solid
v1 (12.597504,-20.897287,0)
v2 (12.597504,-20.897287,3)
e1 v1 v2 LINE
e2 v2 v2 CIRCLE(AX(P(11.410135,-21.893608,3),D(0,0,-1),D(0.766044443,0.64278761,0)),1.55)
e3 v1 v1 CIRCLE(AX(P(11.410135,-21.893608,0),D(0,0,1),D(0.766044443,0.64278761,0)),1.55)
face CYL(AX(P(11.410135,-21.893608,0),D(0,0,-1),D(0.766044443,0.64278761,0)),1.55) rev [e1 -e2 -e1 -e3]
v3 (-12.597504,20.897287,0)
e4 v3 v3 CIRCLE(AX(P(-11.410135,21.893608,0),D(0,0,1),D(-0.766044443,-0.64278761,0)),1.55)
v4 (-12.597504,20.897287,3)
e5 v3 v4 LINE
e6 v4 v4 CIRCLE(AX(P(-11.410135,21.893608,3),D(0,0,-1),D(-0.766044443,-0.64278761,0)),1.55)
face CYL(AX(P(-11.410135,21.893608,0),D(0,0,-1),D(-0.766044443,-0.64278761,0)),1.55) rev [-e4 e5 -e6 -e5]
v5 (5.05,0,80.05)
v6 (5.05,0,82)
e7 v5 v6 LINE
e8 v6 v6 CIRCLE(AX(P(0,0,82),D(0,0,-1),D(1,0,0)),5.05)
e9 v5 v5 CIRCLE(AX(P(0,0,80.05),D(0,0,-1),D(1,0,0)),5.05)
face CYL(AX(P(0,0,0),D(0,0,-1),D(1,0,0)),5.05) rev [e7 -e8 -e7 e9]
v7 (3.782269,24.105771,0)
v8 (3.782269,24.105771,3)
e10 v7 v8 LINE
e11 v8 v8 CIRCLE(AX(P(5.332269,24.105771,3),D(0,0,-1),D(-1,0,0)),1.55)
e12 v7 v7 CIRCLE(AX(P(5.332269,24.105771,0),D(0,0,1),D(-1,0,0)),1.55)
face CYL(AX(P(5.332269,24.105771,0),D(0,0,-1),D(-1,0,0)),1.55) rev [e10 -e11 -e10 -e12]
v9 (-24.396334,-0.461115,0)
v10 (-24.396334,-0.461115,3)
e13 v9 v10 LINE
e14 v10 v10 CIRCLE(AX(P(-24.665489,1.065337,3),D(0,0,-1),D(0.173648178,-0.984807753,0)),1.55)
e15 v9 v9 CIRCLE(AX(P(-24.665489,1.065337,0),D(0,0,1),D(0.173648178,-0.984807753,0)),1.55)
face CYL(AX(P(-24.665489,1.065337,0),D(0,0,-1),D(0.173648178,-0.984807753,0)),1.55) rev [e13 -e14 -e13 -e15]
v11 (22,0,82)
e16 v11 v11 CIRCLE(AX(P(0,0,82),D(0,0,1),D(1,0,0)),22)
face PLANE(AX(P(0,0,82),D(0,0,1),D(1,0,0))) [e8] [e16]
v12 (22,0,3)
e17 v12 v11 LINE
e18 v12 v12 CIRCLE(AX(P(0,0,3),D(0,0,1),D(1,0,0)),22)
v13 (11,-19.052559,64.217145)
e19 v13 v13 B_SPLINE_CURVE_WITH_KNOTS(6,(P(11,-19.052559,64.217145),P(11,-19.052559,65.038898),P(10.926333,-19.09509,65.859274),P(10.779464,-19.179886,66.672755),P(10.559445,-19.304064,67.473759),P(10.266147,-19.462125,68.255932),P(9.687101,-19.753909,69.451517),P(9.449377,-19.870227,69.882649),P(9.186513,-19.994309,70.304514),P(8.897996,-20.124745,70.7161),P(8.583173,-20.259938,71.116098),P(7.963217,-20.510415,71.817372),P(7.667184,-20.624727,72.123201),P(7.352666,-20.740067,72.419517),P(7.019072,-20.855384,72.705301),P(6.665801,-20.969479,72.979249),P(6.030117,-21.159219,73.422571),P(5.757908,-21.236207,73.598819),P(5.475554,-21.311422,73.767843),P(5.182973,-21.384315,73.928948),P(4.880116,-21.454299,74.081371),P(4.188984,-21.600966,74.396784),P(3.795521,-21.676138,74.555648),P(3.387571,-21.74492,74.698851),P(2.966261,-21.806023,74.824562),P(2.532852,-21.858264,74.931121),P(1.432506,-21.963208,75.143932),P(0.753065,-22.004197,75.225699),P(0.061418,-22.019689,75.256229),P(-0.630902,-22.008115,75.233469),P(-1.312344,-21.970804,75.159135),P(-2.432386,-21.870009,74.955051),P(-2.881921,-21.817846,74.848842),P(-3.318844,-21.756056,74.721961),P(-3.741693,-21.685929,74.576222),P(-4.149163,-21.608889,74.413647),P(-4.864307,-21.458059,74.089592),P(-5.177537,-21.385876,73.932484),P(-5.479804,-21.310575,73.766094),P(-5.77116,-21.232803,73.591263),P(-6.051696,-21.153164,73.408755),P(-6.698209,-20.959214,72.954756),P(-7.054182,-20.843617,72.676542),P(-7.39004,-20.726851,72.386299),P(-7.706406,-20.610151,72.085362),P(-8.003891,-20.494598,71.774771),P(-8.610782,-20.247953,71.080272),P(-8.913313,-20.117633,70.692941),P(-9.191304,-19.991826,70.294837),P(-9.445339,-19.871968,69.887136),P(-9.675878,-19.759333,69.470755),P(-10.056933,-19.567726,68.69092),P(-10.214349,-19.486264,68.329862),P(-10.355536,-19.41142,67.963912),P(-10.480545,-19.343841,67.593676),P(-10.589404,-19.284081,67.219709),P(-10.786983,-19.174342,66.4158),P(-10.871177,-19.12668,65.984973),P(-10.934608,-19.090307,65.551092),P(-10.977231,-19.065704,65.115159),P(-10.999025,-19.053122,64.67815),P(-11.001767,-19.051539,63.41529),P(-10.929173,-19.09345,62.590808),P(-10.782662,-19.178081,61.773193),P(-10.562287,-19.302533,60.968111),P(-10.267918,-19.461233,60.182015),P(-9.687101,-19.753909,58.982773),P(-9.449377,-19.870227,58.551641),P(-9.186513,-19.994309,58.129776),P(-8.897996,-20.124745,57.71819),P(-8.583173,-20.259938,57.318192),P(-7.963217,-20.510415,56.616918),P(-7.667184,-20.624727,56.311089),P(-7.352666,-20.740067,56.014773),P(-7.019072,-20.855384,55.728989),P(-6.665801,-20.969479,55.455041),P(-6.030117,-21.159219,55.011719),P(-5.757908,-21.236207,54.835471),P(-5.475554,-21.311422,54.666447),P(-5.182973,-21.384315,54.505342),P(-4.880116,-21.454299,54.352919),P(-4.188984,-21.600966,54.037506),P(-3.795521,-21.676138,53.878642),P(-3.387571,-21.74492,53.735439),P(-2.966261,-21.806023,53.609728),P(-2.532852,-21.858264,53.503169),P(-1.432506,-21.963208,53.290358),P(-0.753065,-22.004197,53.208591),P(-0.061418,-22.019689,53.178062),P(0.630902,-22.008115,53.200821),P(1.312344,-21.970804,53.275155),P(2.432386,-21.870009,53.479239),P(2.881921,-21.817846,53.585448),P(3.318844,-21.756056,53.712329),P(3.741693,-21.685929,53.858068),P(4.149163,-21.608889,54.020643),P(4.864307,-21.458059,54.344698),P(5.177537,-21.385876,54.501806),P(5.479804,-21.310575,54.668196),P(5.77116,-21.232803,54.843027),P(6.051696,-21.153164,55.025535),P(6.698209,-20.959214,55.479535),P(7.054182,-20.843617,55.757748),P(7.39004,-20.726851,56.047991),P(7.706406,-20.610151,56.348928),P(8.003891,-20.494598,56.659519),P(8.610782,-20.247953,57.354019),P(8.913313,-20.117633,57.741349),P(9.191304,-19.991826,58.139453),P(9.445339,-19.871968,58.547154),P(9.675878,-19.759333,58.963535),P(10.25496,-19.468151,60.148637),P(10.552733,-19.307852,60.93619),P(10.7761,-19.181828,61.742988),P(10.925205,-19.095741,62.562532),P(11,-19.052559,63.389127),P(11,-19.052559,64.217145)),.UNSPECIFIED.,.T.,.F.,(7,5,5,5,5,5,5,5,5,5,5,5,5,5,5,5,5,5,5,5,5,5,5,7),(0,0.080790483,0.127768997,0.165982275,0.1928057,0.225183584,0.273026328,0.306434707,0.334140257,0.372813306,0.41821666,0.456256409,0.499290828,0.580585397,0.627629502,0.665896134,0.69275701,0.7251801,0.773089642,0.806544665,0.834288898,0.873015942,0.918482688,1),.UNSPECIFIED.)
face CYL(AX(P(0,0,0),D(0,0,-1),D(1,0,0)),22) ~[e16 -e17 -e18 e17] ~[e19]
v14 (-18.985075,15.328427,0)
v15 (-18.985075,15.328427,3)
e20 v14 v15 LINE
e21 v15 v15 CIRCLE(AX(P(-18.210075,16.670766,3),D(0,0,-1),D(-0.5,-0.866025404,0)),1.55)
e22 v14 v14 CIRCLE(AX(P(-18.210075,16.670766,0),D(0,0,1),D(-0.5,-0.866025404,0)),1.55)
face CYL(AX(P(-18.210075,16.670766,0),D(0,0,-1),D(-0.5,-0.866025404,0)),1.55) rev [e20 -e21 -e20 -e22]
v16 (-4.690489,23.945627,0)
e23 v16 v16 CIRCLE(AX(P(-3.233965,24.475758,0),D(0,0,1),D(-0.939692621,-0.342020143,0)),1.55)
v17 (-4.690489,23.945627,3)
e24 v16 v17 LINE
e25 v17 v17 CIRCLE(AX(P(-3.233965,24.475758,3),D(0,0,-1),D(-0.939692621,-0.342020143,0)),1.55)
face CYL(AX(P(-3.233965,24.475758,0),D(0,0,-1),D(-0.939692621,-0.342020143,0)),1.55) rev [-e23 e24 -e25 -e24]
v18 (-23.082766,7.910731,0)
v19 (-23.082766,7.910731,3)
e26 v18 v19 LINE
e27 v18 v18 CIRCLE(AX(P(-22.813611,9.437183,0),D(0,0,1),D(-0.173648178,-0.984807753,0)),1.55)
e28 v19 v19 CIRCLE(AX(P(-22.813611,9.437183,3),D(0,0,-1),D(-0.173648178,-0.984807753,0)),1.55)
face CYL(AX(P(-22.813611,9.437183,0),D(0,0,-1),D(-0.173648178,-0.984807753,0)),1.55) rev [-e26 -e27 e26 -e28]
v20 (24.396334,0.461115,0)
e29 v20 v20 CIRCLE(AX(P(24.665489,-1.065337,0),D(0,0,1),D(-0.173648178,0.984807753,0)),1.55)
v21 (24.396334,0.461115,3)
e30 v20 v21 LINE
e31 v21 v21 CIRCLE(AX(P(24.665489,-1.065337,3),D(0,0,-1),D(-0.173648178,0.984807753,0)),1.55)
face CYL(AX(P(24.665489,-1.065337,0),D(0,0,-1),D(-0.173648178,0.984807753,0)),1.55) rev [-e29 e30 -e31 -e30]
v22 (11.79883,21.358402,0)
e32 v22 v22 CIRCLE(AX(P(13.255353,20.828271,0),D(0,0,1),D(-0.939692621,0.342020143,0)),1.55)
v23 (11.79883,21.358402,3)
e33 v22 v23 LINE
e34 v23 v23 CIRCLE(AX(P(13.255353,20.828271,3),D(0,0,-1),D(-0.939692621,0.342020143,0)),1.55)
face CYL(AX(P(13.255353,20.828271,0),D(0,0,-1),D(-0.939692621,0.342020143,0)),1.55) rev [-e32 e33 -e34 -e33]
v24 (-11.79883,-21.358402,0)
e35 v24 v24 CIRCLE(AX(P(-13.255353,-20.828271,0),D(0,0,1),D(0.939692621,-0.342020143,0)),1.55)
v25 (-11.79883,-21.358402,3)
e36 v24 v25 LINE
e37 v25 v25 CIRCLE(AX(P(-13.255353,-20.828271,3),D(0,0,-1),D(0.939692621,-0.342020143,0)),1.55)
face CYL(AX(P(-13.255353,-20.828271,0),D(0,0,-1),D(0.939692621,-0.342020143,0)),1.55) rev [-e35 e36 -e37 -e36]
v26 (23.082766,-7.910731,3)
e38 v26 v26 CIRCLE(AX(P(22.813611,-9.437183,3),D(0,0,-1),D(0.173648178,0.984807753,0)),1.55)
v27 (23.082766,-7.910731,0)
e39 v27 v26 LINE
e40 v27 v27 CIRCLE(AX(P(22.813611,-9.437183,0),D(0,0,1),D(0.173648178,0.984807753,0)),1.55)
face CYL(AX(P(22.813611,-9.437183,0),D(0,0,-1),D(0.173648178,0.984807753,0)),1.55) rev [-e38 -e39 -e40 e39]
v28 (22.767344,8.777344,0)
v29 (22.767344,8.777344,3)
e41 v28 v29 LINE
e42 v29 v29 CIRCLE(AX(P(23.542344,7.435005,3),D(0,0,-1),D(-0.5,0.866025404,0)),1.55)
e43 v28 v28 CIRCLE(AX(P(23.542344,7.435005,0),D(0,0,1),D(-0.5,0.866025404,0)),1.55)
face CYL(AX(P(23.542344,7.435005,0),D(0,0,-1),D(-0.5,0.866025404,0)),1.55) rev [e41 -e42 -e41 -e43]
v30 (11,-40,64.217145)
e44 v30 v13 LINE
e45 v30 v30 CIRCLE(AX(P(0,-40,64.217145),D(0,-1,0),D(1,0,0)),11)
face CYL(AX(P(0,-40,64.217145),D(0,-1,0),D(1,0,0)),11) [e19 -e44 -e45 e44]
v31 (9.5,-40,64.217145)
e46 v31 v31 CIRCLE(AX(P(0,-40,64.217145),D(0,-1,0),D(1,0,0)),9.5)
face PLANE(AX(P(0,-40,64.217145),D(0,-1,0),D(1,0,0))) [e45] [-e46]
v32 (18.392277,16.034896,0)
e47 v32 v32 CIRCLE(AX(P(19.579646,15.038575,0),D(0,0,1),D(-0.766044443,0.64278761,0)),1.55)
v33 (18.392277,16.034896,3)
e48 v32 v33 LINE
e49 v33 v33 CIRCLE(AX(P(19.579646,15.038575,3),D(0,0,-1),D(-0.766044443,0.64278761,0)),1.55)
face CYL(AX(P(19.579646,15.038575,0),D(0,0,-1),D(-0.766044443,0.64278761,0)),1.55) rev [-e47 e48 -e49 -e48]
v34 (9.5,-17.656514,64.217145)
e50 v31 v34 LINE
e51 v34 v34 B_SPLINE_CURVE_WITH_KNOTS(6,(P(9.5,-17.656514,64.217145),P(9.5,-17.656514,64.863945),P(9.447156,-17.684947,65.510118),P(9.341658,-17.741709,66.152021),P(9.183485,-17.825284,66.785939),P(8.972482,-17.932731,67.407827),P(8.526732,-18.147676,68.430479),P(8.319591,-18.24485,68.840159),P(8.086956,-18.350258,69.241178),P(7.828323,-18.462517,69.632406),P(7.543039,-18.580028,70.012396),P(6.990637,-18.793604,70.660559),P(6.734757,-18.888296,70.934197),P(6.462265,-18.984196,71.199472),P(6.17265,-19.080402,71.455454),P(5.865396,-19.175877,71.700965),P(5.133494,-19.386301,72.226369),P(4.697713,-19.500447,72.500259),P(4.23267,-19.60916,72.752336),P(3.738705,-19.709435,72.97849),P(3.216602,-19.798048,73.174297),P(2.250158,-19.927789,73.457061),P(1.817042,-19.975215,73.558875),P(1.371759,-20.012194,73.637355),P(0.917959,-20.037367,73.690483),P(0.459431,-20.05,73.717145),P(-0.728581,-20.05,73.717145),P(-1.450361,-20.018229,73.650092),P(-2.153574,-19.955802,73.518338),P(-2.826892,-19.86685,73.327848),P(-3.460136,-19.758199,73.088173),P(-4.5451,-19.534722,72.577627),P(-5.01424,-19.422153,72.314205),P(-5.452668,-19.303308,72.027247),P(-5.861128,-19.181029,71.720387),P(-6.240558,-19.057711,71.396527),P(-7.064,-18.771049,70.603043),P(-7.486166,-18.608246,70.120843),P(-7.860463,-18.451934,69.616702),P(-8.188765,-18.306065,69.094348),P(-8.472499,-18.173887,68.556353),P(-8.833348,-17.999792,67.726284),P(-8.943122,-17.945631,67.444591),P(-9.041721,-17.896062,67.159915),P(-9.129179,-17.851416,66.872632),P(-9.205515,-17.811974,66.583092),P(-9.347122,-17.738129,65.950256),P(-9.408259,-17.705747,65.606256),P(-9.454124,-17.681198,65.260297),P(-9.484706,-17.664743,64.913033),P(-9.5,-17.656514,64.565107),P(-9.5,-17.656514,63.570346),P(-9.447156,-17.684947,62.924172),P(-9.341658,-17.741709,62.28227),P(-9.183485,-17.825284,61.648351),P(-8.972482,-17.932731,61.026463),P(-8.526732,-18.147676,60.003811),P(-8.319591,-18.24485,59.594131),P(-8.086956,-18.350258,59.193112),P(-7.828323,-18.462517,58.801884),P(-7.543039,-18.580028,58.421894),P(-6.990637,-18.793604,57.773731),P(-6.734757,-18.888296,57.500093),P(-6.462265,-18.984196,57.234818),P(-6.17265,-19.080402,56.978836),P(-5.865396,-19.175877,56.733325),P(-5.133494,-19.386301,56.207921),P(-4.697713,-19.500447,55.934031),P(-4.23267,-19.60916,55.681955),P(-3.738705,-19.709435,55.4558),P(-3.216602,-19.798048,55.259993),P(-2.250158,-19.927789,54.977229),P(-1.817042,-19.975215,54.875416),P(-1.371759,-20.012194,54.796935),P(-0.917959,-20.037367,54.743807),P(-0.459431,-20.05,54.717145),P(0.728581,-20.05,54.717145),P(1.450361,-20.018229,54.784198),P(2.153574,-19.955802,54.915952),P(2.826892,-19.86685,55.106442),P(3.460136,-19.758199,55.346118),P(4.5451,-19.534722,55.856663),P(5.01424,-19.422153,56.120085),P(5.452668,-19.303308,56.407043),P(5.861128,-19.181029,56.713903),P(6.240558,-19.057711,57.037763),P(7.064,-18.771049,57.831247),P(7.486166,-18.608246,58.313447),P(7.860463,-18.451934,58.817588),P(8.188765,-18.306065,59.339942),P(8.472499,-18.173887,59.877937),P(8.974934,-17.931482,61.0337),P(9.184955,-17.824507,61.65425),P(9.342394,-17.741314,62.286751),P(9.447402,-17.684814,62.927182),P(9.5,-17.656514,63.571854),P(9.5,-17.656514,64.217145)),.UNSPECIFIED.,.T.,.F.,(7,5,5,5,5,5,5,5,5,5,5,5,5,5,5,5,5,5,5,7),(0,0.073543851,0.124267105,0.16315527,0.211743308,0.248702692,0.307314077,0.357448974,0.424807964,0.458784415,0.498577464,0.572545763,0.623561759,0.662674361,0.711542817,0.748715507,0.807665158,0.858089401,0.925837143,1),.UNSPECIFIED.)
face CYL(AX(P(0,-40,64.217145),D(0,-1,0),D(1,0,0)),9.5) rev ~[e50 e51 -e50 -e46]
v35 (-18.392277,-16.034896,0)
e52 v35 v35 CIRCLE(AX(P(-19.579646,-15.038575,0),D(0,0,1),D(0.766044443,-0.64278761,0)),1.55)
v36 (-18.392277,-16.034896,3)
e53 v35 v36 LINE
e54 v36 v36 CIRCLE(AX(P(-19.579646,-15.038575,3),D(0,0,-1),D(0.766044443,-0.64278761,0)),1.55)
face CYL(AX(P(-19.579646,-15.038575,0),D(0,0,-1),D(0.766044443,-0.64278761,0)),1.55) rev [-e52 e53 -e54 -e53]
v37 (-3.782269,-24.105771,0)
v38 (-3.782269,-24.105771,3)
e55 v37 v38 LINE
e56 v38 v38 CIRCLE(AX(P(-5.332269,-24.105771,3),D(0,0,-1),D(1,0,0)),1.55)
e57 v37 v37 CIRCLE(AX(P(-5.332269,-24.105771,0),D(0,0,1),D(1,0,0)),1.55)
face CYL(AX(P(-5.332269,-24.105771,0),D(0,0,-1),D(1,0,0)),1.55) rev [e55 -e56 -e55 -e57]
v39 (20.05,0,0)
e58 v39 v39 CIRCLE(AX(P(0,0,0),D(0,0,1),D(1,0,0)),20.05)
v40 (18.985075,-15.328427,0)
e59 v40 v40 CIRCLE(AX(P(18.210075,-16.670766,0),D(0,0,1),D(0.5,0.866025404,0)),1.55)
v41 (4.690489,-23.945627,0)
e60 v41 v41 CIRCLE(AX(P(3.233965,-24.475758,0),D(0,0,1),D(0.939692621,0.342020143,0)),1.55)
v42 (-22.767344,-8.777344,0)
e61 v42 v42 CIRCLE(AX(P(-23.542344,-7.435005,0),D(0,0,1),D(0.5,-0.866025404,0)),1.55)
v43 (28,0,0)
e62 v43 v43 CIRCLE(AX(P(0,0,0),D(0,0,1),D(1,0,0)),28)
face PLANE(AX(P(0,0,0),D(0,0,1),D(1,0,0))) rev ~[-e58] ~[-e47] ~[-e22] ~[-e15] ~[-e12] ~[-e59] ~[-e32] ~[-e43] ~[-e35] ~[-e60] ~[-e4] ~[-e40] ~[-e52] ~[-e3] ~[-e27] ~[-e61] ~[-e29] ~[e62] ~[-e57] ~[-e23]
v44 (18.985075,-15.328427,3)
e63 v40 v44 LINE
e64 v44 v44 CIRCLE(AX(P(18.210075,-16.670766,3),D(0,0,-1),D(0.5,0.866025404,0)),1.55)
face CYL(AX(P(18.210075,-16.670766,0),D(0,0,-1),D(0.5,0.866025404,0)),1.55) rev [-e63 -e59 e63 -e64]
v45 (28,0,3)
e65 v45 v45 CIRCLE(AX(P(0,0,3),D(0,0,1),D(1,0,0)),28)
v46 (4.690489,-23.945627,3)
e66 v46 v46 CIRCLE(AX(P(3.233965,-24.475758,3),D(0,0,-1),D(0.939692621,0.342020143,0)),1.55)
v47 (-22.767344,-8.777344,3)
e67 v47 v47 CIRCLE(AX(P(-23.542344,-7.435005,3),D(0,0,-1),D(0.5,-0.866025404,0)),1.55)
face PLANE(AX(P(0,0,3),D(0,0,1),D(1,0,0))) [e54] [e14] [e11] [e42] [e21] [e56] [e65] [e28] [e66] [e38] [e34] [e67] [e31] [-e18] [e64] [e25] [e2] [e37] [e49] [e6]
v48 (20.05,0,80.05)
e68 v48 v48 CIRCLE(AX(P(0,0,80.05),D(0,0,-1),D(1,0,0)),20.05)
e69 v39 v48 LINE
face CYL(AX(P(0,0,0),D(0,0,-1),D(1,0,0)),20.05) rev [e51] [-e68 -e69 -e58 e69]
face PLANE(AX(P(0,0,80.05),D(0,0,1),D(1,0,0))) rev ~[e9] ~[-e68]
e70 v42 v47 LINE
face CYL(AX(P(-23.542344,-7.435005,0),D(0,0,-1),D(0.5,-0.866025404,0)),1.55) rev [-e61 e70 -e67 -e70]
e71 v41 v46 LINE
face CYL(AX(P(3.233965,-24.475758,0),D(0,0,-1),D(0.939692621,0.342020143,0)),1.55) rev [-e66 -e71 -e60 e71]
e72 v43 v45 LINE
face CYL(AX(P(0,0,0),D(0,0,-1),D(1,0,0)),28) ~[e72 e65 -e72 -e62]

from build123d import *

# Parameters (mm, degrees)
F0_R            = 22
F1_DEPTH        = 82
F2_T            = -1.95
F0_R_2          = 28
F3_DEPTH        = 3
F5_R            = 5.05
F6_DEPTH        = 90
F7_R            = 1.55
F8_DEPTH        = 5
F8_COPIES_COUNT = 18
F10_R           = 11
F12_R           = 9.5
F13_DEPTH       = 30


# Not quite as in the source:
# - a pattern or mirror of a feature is missing from the dataset's text; its kind, count and spacing are read off the source's solid


with BuildPart() as f1:
    # F0 (on Top) → F1 (new body)
    with BuildSketch(Plane.XY):
        Circle(F0_R)
    extrude(amount=F1_DEPTH)

    # F2
    f2_openings = [f1.faces().sort_by_distance(p)[0] for p in [
        (0, 0, 0),
    ]]
    offset(amount=F2_T, openings=f2_openings)

    # F0 (on Top) → F3 (join)
    with BuildSketch(Plane.XY):
        Circle(F0_R_2)
        Circle(F0_R, mode=Mode.SUBTRACT)
    extrude(amount=F3_DEPTH)

    # F5 (on Top) → F6 (cut)
    with BuildSketch(Plane.XY):
        Circle(F5_R)
    extrude(amount=F6_DEPTH, mode=Mode.SUBTRACT)

    # F7 (on face) → F8 (cut)
    with BuildSketch(Plane.XY):
        with Locations((-5.3322692402, -24.1057705134)):
            Circle(F7_R)
    f8 = extrude(amount=F8_DEPTH, mode=Mode.SUBTRACT)

    # F8_copies: F8 ×18 about axis
    f8_copies_axis = Axis((0, 0, 0), (0, 0, 1))
    for i in range(1, F8_COPIES_COUNT):
        add(f8.rotate(f8_copies_axis, i * 360 / F8_COPIES_COUNT), mode=Mode.SUBTRACT)

    # F10 (on offset) → F11 (join, up to the next surface of F1)
    with BuildSketch(Plane.XZ.offset(40)):
        with Locations((0, 64.2171450533)):
            Circle(F10_R)
    extrude(until=Until.NEXT, dir=(0, 1, 0))

    # F12 (on face) → F13 (cut)
    with BuildSketch(Plane.XZ.offset(40)):
        with Locations((0, 64.2171450533)):
            Circle(F12_R)
    extrude(amount=-F13_DEPTH, mode=Mode.SUBTRACT)


solid = f1.part
